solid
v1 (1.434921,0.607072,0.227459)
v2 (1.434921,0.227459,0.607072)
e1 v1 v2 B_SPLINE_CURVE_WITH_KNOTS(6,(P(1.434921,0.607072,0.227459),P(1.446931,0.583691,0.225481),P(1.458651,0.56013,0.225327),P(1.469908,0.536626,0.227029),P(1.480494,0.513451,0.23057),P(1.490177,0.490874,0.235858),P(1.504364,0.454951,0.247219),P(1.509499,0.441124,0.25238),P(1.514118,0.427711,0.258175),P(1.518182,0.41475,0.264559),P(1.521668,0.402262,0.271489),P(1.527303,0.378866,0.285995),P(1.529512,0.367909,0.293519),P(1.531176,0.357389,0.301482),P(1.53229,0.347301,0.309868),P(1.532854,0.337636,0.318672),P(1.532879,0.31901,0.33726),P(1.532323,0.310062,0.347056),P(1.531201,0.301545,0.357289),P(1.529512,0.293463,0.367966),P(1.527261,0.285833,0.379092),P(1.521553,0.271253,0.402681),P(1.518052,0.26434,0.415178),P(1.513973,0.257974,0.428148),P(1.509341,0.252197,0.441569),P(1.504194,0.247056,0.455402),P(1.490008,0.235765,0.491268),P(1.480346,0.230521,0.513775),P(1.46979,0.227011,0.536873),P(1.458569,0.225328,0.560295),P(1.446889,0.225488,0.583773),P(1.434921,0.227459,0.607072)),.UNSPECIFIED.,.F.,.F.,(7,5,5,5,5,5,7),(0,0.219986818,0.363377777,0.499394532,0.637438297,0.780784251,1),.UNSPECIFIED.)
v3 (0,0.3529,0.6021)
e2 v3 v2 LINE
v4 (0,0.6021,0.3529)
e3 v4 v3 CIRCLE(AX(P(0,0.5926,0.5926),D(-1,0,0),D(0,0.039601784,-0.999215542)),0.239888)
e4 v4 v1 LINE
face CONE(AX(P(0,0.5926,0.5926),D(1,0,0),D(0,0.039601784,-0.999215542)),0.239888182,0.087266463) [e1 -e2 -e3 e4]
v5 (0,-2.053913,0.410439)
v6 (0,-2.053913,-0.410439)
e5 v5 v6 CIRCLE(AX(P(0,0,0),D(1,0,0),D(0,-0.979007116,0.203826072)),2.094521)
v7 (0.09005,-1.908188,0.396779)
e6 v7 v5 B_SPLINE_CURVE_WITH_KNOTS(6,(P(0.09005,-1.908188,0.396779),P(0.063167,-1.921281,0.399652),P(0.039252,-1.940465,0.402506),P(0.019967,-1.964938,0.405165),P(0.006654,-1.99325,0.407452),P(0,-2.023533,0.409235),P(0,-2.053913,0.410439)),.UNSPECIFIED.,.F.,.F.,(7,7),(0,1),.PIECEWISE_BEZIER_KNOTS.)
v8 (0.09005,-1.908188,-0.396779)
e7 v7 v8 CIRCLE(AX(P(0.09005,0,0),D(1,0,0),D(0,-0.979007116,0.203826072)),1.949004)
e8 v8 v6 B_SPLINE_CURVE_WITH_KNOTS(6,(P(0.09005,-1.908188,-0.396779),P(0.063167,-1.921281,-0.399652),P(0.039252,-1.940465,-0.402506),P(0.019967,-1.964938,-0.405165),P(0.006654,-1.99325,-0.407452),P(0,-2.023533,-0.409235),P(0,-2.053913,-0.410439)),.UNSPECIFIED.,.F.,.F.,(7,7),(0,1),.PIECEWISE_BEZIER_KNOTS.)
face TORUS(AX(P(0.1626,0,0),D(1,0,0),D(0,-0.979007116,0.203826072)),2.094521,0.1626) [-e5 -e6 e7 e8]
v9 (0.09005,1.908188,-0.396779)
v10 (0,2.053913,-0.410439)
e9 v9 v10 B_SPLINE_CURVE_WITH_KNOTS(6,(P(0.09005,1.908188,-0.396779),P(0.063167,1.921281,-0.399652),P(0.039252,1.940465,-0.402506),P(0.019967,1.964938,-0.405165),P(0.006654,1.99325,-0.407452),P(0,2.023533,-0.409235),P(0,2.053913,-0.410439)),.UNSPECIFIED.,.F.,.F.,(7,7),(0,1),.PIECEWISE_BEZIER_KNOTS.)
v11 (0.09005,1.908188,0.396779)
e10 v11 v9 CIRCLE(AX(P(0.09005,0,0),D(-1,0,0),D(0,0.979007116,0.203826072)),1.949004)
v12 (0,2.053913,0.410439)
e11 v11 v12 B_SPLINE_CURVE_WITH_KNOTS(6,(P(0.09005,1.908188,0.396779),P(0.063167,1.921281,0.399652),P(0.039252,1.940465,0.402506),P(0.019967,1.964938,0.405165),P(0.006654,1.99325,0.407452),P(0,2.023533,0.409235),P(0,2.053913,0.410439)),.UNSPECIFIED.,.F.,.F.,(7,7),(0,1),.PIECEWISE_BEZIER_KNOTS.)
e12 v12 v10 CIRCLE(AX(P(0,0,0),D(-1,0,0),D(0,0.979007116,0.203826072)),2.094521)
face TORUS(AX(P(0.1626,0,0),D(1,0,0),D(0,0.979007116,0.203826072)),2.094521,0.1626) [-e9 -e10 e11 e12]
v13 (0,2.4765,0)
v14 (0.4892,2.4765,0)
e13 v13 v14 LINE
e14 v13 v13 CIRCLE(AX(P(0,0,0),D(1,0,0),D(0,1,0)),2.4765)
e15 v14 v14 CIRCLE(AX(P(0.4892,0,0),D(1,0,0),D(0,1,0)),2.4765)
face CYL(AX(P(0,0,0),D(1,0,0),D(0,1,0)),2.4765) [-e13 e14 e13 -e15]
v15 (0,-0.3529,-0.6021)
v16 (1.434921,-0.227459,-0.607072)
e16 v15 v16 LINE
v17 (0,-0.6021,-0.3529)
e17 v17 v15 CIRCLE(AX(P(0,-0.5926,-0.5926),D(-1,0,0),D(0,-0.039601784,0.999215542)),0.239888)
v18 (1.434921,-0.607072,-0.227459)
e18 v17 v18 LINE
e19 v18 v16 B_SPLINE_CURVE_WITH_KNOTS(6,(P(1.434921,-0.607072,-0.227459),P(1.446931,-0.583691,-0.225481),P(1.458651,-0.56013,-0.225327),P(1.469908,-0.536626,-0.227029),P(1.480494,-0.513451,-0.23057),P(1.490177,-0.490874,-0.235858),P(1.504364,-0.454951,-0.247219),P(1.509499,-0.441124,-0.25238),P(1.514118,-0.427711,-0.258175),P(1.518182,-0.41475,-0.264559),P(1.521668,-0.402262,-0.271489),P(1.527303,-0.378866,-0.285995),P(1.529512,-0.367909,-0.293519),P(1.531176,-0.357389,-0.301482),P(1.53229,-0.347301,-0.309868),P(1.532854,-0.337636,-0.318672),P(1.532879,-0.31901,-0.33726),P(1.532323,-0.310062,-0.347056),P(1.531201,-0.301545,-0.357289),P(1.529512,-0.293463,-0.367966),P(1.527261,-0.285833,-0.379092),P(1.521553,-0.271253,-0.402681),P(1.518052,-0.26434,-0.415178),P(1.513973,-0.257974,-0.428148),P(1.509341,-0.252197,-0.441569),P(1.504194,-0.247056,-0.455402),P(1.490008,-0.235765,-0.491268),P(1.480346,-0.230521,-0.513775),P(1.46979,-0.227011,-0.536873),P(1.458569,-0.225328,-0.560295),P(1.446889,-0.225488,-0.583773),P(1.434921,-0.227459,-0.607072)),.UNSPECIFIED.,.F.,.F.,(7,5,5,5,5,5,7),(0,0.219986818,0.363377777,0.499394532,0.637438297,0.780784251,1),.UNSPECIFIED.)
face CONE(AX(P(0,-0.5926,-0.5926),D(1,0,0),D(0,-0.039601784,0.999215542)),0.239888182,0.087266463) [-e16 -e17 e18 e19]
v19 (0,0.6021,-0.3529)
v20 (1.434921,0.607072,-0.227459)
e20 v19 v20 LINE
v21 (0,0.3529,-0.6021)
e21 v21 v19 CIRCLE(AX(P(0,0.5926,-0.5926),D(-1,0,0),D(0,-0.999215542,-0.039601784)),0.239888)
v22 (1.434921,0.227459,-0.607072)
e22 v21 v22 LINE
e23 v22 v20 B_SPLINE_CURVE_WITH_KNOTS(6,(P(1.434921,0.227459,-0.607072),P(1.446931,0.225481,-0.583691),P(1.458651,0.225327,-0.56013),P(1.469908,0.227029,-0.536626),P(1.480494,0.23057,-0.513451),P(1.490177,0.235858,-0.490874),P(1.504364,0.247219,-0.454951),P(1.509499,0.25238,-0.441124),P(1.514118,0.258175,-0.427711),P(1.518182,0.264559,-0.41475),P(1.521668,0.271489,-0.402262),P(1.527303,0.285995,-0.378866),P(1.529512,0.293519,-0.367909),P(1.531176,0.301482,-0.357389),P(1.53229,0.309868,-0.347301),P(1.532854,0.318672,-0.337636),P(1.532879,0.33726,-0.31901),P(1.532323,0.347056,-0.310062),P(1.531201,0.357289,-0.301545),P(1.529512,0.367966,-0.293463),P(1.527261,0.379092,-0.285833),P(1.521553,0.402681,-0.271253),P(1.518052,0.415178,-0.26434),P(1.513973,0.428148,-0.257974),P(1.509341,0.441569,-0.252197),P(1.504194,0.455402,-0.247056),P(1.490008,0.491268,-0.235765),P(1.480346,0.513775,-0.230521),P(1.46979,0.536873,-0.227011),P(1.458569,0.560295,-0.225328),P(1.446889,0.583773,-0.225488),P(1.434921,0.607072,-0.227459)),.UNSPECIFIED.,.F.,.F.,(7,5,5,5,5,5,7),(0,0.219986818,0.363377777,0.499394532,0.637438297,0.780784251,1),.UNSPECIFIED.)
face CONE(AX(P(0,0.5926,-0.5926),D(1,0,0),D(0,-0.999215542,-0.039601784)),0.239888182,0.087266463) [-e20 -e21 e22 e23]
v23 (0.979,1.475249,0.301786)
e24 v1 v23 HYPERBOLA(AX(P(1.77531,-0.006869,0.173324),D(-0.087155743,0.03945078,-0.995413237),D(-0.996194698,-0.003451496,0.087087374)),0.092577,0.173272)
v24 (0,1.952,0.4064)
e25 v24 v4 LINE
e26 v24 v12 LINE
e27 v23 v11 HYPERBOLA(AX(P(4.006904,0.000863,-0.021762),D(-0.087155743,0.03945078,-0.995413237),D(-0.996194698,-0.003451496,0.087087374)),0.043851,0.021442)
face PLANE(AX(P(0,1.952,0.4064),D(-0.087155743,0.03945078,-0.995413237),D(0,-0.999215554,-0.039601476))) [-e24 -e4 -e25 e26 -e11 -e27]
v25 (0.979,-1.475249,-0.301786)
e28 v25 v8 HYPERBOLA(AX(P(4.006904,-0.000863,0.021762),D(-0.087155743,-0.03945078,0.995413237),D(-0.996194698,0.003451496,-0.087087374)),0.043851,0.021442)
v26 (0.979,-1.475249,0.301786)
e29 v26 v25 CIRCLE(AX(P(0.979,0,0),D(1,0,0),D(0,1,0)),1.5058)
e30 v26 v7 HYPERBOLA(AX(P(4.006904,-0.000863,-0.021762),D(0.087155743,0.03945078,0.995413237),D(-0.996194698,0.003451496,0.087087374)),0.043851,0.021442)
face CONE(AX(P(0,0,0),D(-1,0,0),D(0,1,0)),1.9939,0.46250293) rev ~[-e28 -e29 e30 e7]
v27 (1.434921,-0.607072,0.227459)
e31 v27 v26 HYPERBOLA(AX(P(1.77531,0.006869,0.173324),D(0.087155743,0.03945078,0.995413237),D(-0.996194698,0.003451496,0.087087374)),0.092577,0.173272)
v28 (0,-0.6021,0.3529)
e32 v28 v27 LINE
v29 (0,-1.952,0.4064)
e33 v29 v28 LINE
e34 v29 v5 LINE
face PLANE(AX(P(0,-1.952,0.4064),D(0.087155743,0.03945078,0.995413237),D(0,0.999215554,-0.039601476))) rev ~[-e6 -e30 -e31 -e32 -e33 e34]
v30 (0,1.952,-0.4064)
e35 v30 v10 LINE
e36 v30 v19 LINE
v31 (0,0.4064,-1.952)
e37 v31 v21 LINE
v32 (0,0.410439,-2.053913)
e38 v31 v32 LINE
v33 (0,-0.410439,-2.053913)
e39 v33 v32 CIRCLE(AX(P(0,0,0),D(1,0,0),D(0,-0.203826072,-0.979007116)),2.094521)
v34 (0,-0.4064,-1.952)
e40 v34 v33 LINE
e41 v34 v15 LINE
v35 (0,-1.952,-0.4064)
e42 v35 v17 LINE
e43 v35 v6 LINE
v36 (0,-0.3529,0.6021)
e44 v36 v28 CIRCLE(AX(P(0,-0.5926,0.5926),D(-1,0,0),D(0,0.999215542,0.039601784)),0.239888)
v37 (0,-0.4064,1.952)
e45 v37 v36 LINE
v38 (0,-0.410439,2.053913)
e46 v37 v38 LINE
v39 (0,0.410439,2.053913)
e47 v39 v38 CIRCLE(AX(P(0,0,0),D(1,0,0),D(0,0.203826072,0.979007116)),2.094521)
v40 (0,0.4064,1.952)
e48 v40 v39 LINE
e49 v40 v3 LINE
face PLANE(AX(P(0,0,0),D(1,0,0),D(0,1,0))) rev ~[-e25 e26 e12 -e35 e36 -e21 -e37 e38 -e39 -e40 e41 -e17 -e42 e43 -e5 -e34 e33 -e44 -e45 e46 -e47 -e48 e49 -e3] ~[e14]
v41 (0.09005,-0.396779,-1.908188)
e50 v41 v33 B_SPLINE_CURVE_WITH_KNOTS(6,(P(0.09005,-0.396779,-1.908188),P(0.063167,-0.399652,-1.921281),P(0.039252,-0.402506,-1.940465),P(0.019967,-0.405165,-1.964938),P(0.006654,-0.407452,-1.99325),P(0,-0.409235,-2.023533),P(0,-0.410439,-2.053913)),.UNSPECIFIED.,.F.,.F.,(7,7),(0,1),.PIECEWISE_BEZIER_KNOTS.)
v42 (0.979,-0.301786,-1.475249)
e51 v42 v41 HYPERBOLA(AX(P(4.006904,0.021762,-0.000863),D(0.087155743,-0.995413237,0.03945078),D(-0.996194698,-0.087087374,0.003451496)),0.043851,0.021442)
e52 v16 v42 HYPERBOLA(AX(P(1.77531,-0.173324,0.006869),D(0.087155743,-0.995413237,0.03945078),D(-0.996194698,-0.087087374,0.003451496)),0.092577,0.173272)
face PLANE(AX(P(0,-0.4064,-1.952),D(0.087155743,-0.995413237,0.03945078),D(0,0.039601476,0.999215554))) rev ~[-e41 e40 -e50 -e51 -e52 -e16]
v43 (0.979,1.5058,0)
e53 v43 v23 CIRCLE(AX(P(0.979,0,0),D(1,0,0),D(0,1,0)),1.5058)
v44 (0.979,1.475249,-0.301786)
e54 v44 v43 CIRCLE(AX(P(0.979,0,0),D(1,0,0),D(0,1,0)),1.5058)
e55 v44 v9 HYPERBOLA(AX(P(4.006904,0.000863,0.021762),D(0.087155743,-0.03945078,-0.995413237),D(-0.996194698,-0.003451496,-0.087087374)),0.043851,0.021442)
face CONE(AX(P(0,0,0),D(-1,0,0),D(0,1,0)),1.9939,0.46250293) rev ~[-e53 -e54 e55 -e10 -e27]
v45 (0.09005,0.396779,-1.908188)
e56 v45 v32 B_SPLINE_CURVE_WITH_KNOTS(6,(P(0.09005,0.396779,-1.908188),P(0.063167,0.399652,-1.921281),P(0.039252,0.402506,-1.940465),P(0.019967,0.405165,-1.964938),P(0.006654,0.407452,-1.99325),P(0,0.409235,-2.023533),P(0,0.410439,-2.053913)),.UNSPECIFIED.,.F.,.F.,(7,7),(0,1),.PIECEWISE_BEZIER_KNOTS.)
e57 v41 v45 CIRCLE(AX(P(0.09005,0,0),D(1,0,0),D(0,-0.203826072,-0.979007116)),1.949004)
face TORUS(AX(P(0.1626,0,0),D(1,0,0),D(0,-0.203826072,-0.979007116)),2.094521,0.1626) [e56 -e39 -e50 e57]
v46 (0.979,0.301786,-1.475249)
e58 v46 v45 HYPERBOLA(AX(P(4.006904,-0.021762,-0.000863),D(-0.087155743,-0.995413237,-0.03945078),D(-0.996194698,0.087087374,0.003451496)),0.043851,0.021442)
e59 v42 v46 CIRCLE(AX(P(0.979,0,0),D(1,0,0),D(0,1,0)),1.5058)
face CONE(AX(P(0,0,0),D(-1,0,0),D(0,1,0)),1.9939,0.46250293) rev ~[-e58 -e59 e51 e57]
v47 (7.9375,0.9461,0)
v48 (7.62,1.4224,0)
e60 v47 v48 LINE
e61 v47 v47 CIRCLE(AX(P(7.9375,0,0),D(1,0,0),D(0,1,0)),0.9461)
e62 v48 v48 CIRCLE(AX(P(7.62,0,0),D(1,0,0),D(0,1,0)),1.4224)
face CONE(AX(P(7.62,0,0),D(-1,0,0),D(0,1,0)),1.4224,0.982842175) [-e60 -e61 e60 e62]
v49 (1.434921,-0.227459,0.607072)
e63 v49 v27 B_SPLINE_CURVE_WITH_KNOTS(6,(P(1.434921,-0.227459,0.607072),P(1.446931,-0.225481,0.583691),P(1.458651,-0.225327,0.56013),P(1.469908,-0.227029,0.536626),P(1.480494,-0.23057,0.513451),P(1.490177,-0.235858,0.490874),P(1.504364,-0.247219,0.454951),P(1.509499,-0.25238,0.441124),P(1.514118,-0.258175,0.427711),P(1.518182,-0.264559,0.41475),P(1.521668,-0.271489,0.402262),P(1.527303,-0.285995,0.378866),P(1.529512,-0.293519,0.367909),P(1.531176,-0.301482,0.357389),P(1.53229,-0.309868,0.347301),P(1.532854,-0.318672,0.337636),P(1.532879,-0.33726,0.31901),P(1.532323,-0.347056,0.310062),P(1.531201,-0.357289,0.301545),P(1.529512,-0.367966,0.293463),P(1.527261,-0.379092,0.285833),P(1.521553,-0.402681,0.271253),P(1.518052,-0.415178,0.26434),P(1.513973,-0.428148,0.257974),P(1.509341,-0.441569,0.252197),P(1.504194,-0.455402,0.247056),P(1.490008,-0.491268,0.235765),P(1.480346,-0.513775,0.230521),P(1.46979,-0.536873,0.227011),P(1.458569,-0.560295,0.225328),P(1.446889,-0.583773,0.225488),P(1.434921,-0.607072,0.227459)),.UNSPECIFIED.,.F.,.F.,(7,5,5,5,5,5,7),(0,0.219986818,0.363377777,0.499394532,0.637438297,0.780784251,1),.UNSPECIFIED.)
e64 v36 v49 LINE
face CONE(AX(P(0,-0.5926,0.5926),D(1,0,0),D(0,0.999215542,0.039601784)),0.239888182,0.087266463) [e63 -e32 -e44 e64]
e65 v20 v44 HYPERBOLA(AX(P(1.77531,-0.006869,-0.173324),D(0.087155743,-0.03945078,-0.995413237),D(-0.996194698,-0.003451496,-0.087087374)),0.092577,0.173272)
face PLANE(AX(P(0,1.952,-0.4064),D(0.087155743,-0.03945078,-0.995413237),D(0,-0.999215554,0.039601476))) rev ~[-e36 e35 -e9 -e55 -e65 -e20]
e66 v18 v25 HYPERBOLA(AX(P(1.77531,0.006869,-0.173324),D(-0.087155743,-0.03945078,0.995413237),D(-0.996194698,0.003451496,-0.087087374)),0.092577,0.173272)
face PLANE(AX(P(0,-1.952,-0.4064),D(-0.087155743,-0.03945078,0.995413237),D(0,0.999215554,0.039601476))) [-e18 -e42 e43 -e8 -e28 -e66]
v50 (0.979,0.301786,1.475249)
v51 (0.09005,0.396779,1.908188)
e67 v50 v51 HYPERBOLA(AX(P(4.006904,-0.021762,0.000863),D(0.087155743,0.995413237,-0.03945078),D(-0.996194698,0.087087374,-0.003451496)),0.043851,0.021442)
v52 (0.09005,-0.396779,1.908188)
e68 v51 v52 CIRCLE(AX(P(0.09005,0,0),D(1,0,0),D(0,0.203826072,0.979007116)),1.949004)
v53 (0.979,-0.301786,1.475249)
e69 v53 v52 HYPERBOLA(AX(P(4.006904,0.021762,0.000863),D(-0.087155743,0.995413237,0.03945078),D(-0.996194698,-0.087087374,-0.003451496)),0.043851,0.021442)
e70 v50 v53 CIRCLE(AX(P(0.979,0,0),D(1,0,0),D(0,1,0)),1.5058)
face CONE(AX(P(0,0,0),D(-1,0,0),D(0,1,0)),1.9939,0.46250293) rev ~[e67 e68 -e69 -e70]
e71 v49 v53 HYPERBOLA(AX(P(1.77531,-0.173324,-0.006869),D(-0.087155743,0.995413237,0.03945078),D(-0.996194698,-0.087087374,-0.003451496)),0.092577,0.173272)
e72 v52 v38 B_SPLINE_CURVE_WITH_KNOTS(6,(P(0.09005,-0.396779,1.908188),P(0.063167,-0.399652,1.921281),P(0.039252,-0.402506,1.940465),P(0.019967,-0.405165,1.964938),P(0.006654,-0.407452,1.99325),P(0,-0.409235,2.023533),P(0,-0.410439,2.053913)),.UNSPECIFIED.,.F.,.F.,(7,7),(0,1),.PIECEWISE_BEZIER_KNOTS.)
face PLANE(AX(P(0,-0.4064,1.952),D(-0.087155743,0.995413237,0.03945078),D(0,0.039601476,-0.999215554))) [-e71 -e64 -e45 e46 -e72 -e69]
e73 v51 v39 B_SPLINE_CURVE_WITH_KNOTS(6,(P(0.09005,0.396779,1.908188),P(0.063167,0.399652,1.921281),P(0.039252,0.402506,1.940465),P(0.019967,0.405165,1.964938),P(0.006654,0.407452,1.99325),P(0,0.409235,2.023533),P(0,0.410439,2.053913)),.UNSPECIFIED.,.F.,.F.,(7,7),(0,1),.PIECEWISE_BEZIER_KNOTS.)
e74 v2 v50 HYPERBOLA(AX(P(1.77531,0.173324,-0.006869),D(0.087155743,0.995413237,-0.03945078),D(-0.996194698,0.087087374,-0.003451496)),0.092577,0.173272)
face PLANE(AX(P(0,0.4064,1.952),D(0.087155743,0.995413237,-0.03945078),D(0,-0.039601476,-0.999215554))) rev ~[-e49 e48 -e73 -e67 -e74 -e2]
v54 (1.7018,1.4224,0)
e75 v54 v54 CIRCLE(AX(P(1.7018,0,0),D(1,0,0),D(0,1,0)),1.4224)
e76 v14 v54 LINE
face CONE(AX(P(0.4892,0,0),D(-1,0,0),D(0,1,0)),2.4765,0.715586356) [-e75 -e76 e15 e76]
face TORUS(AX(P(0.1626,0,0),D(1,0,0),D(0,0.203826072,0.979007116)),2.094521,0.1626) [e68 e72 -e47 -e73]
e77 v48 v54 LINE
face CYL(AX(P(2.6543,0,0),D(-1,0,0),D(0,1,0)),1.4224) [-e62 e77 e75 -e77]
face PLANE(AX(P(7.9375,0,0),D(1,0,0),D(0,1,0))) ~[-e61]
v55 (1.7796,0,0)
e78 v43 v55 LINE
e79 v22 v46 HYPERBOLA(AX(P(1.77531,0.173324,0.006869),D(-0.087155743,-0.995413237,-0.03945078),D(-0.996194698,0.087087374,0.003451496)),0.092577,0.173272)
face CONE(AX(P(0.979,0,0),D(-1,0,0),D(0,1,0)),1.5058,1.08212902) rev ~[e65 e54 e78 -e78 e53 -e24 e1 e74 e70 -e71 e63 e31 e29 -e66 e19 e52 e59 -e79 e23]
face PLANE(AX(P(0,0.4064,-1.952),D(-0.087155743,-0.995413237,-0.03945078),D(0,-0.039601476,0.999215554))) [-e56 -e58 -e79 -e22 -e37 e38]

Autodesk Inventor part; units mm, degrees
ref_plane "YZ Plane" through (0, 0, 0) normal (1, 0, 0) x (0, 1, 0)
ref_plane "XZ Plane" through (0, 0, 0) normal (0, 1, 0) x (-1, 0, 0)
sketch "Sketch1" plane through (0, 0, 0) normal (0, 0, 1) x (1, 0, 0)
  line L0 (1.7796, 0) -> (7.9375, 0)
  line L1 (7.9375, 0) -> (7.9375, 1.4224)
  line L2 (7.9375, 1.4224) -> (3.2893, 1.4224)
  line L3 (3.2893, 1.4224) -> (2.6543, 1.4224)
  line L4 (2.6543, 1.4224) -> (1.7018, 1.4224)
  line L5 (0, 2.4765) -> (0, 1.9939)
  line L6 (0, 1.9939) -> (0.979, 1.5058)
  line L7 (0.979, 1.5058) -> (1.7796, 0)
  line L8 (-1.5875, 0) -> (9.525, 0) projected
  line L9 (0, -0.4953) -> (0, 2.9718) projected
  line L10 (0, 2.4765) -> (0.4892, 2.4765)
  line L11 (0.4892, 2.4765) -> (1.7018, 1.4224)
  line L12 (3.2893, 1.4224) -> (1.7018, 1.4224) construction
  dimension "d1" = 4.6482
  dimension "d2" = 2.8448
  dimension "d3" = 2.8448
  dimension "d4" = 3.9878
  dimension "d5" = 26.5
  dimension "d6" = 62
  dimension "d7" = 1.7796
  dimension "d8" = 0.635
  dimension "d12" = 4.953
  dimension "d13" = 41
  dimension "d15" = 7.9375
  dimension "d24" = 1.7018
revolve "Body" add sketch "Sketch1" angle 360 about axis through (1.7796, 0, 0) along (1, 0, 0) contours L7 L6 L5 L10 L11 L4 L3 L2 L1 L0
sketch "Sketch2" plane through (0, 0, 0) normal (-1, 0, 0) x (0, 0, 1)
  line L0 (0, 1.9939) -> (0, 0) construction
  line L1 (0, 0) -> (1.9939, 0) construction
  arc A0 (0.5982, 0) -> (0, 0.5982) centre (0, 0) ccw construction
  arc A1 (0.6979, 0) -> (0, 0.6979) centre (0, 0) ccw construction
  arc A2 (1.952, 0.4064) -> (0.4064, 1.952) centre (0, 0) ccw
  line L2 (0, 0) -> (1.4099, 1.4099) construction
  line L3 (0.4064, 1.952) -> (0.3529, 0.6021)
  line L4 (1.952, 0.4064) -> (0.6021, 0.3529)
  arc A3 (0.4064, 1.952) -> (0, 1.9939) centre (0, 0) ccw
  arc A4 (1.9939, 0) -> (1.952, 0.4064) centre (0, 0) ccw
  line L5 (0, -3.4671) -> (0, 3.4671) projected
  line L6 (-3.4671, 0) -> (3.4671, 0) projected
  arc A5 (0.4064, -1.952) -> (1.952, -0.4064) centre (0, 0) ccw
  line L7 (0.4064, -1.952) -> (0.3529, -0.6021)
  line L8 (1.952, -0.4064) -> (0.6021, -0.3529)
  arc A6 (0, -1.9939) -> (0.4064, -1.952) centre (0, 0) ccw
  arc A7 (1.952, -0.4064) -> (1.9939, 0) centre (0, 0) ccw
  arc A8 (-0.4064, 1.952) -> (-1.952, 0.4064) centre (0, 0) ccw
  line L9 (-0.4064, 1.952) -> (-0.3529, 0.6021)
  line L10 (-1.952, 0.4064) -> (-0.6021, 0.3529)
  arc A9 (0, 1.9939) -> (-0.4064, 1.952) centre (0, 0) ccw
  arc A10 (-1.952, 0.4064) -> (-1.9939, 0) centre (0, 0) ccw
  arc A11 (-0.4064, -1.952) -> (0, -1.9939) centre (0, 0) ccw
  arc A12 (-1.952, -0.4064) -> (-0.4064, -1.952) centre (0, 0) ccw
  arc A13 (-1.9939, 0) -> (-1.952, -0.4064) centre (0, 0) ccw
  line L11 (-1.952, -0.4064) -> (-0.6021, -0.3529)
  line L12 (-0.4064, -1.952) -> (-0.3529, -0.6021)
  arc A14 (0.3529, 0.6021) -> (0.6021, 0.3529) centre (0.5926, 0.5926) ccw
  arc A15 (0.6021, -0.3529) -> (0.3529, -0.6021) centre (0.5926, -0.5926) ccw
  arc A16 (-0.6021, 0.3529) -> (-0.3529, 0.6021) centre (-0.5926, 0.5926) ccw
  arc A17 (-0.3529, -0.6021) -> (-0.6021, -0.3529) centre (-0.5926, -0.5926) ccw
  point P0 (1.4099, -1.4099)
  point P1 (-1.4099, 1.4099)
  point P2 (-1.4099, -1.4099)
  dimension "d17" = 1.1963
  dimension "d18" = 1.3957
  dimension "d19" = 3.9878
  dimension "d20" = 45
  dimension "d21" = 0.4064
extrude "Slot" add sketch "Sketch2" against normal up to next draft 5 contours L4 A14 L3 A2 | A5 L7 A15 L8 | L9 A16 L10 A8 | A12 L11 A17 L12
fillet "Fillet1" radius 0.1626 4 edges at (0, 1.9939, 0) (0, 0, -1.9939) (0, -1.9939, 0) (0, 0, 1.9939)
thread "Thread" size "4-40 UNC" class "2A" standard "ANSI Unified Screw Threads" length 4.6482
chamfer "Chamfer1" distance 0.4763 distance2 0.3175 1 edges at (7.9375, -1.4224, 0) measured on face at (7.9375, -0.4198, 0.2203)
ref_plane "Work Plane2" through (3.35, 0, 0) normal (0, 0, -1) x (1, 0, 0)
equation "\"d1\" = GEL"
equation "\"d2\" = GD"
equation "\"d3\" = BDM"
equation "\"d4\" = SDM"
equation "\"d7\" = INTI"
equation "\"d8\" = GAL"
equation "\"d12\" = KOD"
equation "\"d13\" = 0.5 * SEWI"
equation "\"d15\" = NLG"
equation "\"d24\" = KOH"
equation "\"d17\" = 0.3 * SDM"
equation "\"d18\" = 0.35 * SDM"
equation "\"d19\" = SDM"
equation "\"d21\" = 0.5 * SBR"
equation "\"d23\" = 0.2 * SBR"
equation "\"d10\" = GEL"
equation "\"d25\" = -0.5 * SPD + 0.5 * GD"
equation "\"d26\" = 0.5 * GAL"
equation "\"NLG\" = 7.9375"
equation "\"GEL\" = 4.6482"
equation "\"GAL\" = 0.635"
equation "\"SPD\" = 1.8923"
equation "\"KOD\" = 4.953"
equation "\"KOH\" = 1.7018"
equation "\"SBR\" = 0.8128"
equation "\"SDM\" = 3.9878"
equation "\"GD\" = NND"
equation "\"BDM\" = NND"
equation "\"SEWI\" = 82deg"
equation "\"d9\" = SDM"
equation "\"GUL\" = 0.75 * GAL"
equation "\"TOA\" = 30deg"
equation "\"THREADDIA\" = 2.8448"
equation "\"NND\" = 2.8448"
equation "\"INTI1\" = 2.2352"
equation "\"GD1\" = SPD"
equation "\"INTI\" = 1.779618"
properties part number "ANSI B18.6.3 - 4-40 x 5/16, CRFCHMSTII(3)" material "Steel, Mild"
